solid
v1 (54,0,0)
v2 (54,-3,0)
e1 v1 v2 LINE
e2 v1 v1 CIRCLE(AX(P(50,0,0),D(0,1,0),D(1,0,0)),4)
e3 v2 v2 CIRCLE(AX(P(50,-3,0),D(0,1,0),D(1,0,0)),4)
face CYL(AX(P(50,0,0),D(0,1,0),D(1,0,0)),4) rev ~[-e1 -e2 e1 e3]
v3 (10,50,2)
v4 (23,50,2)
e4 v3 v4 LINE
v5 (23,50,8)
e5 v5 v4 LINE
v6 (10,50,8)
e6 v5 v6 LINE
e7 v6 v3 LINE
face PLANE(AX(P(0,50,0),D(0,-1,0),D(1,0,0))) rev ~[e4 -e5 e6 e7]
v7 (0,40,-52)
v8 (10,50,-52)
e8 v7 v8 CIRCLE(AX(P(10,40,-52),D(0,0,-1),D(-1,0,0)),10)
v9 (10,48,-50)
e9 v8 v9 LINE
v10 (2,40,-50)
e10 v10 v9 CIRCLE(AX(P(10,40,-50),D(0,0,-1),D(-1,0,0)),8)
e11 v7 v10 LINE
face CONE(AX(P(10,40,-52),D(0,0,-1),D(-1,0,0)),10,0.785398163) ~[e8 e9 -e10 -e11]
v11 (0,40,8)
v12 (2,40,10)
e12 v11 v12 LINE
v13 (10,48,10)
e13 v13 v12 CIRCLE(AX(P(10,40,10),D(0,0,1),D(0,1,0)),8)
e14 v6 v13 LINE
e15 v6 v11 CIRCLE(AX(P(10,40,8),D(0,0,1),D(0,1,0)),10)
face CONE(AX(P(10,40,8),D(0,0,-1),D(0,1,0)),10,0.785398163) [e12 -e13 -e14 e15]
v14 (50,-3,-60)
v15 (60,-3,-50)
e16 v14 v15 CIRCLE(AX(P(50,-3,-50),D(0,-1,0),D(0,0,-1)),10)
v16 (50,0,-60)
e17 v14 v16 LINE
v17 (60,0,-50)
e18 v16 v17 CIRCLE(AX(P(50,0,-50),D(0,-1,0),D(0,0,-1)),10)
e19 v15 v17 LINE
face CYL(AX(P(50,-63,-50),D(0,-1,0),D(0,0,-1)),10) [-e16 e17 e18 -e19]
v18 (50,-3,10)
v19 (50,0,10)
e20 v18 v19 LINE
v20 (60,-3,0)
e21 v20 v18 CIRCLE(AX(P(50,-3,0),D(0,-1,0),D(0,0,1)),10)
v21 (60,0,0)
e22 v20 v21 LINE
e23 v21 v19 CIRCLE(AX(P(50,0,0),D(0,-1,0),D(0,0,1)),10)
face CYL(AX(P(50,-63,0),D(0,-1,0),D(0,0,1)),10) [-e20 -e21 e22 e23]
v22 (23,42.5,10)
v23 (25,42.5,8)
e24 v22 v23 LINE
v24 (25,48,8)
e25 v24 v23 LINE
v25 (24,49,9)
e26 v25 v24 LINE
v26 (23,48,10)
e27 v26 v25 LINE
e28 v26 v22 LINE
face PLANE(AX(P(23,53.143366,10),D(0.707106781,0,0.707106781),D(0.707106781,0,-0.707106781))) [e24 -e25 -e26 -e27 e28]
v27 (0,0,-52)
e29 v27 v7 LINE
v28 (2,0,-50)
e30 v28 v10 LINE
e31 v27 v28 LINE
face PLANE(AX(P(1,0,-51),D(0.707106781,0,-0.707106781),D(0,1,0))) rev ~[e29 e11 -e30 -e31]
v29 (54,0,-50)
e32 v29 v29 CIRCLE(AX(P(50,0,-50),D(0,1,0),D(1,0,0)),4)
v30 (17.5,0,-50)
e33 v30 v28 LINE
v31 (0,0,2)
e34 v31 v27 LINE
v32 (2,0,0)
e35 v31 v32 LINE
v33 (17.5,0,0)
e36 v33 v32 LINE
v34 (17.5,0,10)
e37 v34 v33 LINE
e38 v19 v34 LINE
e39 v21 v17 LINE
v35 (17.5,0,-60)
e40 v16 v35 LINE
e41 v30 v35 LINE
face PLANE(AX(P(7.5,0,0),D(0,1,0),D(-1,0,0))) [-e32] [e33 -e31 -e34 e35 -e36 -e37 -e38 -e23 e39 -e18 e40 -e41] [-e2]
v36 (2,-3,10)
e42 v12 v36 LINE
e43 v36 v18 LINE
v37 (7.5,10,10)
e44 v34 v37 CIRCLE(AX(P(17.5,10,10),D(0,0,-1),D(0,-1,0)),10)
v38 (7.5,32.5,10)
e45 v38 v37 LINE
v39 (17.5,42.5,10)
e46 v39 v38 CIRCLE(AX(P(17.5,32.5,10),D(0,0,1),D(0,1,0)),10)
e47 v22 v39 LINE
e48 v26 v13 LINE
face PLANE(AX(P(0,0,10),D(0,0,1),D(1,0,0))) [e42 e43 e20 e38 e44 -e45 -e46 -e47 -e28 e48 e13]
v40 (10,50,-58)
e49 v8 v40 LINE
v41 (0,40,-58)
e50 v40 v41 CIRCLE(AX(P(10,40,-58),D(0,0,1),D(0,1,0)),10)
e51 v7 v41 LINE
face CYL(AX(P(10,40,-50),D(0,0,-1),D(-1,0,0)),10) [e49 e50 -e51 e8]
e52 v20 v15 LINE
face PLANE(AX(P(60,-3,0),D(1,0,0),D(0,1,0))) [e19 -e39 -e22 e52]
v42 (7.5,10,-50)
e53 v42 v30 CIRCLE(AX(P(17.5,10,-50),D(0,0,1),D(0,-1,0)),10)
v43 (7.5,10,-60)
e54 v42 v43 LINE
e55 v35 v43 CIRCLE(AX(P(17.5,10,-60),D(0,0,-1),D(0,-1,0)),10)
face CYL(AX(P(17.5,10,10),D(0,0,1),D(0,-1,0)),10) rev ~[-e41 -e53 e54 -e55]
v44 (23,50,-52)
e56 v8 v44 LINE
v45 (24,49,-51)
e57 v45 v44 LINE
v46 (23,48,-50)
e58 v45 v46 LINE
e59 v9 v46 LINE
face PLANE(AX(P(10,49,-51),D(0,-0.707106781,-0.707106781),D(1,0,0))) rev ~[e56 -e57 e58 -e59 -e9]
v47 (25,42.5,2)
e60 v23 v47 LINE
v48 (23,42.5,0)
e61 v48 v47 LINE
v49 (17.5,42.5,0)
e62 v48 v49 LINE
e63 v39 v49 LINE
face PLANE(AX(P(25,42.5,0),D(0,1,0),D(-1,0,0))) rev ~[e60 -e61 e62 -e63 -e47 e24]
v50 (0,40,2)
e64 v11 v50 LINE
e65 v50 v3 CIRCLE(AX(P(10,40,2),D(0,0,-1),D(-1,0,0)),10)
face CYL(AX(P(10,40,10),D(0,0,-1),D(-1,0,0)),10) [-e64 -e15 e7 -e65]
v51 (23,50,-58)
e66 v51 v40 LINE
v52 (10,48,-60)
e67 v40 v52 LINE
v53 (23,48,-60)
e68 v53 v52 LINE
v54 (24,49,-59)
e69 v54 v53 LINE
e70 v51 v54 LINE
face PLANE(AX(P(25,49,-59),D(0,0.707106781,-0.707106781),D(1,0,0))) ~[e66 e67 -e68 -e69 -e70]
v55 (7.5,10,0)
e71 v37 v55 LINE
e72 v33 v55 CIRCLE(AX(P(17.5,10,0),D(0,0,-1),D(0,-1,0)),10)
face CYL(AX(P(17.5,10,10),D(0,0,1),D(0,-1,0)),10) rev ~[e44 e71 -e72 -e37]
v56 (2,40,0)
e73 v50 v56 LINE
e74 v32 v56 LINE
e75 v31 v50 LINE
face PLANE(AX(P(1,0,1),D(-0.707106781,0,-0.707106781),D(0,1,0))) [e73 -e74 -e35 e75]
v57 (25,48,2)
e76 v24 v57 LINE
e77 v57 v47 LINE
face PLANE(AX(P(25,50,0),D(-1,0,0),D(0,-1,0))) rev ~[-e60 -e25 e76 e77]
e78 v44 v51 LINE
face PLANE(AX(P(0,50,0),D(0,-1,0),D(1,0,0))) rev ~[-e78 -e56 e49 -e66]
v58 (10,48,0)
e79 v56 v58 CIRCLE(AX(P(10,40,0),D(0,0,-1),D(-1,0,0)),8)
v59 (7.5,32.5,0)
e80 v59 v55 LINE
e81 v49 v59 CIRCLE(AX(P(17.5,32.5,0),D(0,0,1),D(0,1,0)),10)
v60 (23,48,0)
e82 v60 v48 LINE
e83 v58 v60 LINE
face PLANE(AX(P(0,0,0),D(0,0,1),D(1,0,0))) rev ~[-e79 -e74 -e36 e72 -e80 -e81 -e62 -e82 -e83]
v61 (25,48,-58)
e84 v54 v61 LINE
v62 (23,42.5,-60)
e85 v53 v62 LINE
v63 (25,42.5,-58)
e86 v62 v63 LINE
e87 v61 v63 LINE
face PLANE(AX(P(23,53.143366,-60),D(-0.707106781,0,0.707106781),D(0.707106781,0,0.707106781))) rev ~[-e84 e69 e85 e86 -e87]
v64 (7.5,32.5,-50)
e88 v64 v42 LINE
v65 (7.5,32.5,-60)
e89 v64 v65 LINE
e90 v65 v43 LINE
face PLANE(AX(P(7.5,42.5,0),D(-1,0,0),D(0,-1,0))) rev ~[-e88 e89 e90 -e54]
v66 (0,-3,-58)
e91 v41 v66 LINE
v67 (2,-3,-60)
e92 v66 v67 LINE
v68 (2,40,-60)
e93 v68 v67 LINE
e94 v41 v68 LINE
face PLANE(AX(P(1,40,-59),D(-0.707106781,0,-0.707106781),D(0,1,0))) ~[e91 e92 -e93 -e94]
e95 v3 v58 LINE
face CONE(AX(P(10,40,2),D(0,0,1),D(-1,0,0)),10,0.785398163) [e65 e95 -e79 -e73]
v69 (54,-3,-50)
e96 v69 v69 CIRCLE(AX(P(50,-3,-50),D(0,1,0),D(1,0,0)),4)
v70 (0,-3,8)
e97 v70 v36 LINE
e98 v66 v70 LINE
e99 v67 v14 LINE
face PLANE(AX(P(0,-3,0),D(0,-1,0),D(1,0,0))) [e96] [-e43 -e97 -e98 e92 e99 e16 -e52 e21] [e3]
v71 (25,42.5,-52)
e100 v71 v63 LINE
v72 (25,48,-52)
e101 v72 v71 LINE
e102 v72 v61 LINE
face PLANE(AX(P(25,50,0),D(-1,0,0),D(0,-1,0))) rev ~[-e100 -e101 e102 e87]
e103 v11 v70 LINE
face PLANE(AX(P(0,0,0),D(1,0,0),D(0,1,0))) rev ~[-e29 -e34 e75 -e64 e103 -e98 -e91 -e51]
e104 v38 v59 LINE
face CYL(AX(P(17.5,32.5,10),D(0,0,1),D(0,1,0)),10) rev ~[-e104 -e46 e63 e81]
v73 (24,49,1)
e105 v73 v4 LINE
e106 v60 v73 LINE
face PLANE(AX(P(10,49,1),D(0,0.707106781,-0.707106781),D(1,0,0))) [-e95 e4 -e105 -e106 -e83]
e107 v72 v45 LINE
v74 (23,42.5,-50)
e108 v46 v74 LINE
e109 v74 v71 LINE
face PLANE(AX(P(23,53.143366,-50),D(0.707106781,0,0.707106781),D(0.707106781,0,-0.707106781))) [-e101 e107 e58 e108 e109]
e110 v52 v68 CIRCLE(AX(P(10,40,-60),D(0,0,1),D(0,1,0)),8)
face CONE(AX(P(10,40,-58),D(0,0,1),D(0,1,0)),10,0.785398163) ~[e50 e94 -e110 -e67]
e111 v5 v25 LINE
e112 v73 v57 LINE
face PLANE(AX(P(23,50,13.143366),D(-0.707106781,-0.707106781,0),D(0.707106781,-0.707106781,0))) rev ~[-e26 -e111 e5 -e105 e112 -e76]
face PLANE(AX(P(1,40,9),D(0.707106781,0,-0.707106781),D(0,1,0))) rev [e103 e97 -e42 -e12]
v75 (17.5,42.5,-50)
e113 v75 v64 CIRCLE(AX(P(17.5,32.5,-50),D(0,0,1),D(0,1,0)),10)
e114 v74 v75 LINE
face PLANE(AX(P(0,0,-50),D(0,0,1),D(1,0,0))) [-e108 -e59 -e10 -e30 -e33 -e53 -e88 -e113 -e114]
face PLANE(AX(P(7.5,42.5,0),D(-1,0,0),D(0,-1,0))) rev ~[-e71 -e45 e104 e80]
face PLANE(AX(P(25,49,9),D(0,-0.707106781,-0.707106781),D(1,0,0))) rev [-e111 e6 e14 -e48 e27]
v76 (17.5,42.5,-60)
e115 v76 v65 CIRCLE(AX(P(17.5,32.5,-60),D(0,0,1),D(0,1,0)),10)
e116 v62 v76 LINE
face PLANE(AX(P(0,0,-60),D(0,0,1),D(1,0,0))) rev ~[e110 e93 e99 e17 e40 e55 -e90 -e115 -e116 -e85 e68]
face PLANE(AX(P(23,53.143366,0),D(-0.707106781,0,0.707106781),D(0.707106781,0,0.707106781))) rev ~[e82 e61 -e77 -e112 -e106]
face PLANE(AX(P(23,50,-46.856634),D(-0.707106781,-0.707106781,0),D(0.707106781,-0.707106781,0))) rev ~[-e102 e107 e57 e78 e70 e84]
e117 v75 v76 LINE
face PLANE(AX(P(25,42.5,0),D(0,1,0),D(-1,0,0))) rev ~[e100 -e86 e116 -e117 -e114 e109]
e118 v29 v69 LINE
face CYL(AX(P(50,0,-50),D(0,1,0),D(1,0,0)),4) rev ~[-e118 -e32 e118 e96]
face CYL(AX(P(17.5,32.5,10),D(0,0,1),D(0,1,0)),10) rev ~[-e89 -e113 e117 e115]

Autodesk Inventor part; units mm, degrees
ref_plane "YZ Plane" through (0, 0, 0) normal (1, 0, 0) x (0, 1, 0)
ref_plane "XZ Plane" through (0, 0, 0) normal (0, 1, 0) x (-1, 0, 0)
ref_plane "XY Plane" through (0, 0, 0) normal (0, 0, 1) x (1, 0, 0)
sketch "Sketch1" plane through (0, 0, 0) normal (0, 0, 1) x (1, 0, 0)
  line L0 (0, 0) -> (0, 50)
  line L1 (0, 50) -> (25, 50)
  line L2 (25, 50) -> (25, 42.5)
  line L3 (25, 42.5) -> (7.5, 42.5)
  line L4 (7.5, 42.5) -> (7.5, 0)
  line L5 (7.5, 0) -> (0, 0)
  line L6 (0, 0) -> (-20, 0)
  line L7 (-20, 0) -> (-20, -3)
  line L8 (-20, -3) -> (60, -3)
  line L9 (60, -3) -> (60, 0)
  line L10 (60, 0) -> (7.5, 0)
  line L11 (0, 0) -> (0, -3)
  dimension "d0" = 50
  dimension "d1" = 25
  dimension "d2" = 7.5
  dimension "d3" = 17.5
  dimension "d4" = 20
  dimension "d5" = 3
  dimension "d6" = 80
extrude "Extrusion1" add sketch "Sketch1" along normal blind 10 contours L5 L10 L9 L8 L11
extrude "Extrusion2" add sketch "Sketch1" along normal blind 10 contours L0 L1 L2 L3 L4 L5
extrude "Extrusion3" add sketch "Sketch1" against normal blind 60 contours L5 L10 L9 L8 L11
extrude "Extrusion4" add sketch "Sketch1" against normal blind 60 contours L0 L1 L2 L3 L4 L5
extrude "Extrusion5" cut sketch "Sketch1" against normal blind 50 contours L0 L1 L2 L3 L4 L5
fillet "Fillet1" radius 10 5 edges at (60, -1.5, 10) (60, -1.5, -60) (7.5, 0, 5) (7.5, 42.5, 5) (7.5, 42.5, -55)
fillet "Fillet2" radius 10 2 edges at (0, 50, -55) (0, 50, 5)
chamfer "Chamfer1" distance 2 angle 45 12 edges at (0, 18.5, -60) (2.9289, 47.0711, -60) (17.5, 50, -60) (0, 18.5, 10) (2.9289, 47.0711, 10) (17.5, 50, 10) (0, 20, -50) (2.9289, 47.0711, -50) (17.5, 50, -50) (0, 20, 0) (2.9289, 47.0711, 0) (17.5, 50, 0)
chamfer "Chamfer2" distance 2 angle 45 6 edges at (25, 45.25, -60) (25, 50, -55) (25, 45.25, -50) (25, 45.25, 0) (25, 45.25, 10) (25, 50, 5)
sketch "Sketch2" plane through (17.5, 0, 10) normal (0, 1, 0) x (1, 0, 0)
  arc A0 (32.5, 0) -> (42.5, 10) centre (32.5, 10) ccw projected
  arc A1 (42.5, 60) -> (32.5, 70) centre (32.5, 60) ccw projected
  circle A2 centre (32.5, 10) radius 4
  circle A3 centre (32.5, 60) radius 4
  point P0 (-17.5, 10)
  dimension "d25" = 8
  dimension "d26" = 8
extrude "Extrusion6" cut sketch "Sketch2" against normal blind 60
properties part number "Hook"
